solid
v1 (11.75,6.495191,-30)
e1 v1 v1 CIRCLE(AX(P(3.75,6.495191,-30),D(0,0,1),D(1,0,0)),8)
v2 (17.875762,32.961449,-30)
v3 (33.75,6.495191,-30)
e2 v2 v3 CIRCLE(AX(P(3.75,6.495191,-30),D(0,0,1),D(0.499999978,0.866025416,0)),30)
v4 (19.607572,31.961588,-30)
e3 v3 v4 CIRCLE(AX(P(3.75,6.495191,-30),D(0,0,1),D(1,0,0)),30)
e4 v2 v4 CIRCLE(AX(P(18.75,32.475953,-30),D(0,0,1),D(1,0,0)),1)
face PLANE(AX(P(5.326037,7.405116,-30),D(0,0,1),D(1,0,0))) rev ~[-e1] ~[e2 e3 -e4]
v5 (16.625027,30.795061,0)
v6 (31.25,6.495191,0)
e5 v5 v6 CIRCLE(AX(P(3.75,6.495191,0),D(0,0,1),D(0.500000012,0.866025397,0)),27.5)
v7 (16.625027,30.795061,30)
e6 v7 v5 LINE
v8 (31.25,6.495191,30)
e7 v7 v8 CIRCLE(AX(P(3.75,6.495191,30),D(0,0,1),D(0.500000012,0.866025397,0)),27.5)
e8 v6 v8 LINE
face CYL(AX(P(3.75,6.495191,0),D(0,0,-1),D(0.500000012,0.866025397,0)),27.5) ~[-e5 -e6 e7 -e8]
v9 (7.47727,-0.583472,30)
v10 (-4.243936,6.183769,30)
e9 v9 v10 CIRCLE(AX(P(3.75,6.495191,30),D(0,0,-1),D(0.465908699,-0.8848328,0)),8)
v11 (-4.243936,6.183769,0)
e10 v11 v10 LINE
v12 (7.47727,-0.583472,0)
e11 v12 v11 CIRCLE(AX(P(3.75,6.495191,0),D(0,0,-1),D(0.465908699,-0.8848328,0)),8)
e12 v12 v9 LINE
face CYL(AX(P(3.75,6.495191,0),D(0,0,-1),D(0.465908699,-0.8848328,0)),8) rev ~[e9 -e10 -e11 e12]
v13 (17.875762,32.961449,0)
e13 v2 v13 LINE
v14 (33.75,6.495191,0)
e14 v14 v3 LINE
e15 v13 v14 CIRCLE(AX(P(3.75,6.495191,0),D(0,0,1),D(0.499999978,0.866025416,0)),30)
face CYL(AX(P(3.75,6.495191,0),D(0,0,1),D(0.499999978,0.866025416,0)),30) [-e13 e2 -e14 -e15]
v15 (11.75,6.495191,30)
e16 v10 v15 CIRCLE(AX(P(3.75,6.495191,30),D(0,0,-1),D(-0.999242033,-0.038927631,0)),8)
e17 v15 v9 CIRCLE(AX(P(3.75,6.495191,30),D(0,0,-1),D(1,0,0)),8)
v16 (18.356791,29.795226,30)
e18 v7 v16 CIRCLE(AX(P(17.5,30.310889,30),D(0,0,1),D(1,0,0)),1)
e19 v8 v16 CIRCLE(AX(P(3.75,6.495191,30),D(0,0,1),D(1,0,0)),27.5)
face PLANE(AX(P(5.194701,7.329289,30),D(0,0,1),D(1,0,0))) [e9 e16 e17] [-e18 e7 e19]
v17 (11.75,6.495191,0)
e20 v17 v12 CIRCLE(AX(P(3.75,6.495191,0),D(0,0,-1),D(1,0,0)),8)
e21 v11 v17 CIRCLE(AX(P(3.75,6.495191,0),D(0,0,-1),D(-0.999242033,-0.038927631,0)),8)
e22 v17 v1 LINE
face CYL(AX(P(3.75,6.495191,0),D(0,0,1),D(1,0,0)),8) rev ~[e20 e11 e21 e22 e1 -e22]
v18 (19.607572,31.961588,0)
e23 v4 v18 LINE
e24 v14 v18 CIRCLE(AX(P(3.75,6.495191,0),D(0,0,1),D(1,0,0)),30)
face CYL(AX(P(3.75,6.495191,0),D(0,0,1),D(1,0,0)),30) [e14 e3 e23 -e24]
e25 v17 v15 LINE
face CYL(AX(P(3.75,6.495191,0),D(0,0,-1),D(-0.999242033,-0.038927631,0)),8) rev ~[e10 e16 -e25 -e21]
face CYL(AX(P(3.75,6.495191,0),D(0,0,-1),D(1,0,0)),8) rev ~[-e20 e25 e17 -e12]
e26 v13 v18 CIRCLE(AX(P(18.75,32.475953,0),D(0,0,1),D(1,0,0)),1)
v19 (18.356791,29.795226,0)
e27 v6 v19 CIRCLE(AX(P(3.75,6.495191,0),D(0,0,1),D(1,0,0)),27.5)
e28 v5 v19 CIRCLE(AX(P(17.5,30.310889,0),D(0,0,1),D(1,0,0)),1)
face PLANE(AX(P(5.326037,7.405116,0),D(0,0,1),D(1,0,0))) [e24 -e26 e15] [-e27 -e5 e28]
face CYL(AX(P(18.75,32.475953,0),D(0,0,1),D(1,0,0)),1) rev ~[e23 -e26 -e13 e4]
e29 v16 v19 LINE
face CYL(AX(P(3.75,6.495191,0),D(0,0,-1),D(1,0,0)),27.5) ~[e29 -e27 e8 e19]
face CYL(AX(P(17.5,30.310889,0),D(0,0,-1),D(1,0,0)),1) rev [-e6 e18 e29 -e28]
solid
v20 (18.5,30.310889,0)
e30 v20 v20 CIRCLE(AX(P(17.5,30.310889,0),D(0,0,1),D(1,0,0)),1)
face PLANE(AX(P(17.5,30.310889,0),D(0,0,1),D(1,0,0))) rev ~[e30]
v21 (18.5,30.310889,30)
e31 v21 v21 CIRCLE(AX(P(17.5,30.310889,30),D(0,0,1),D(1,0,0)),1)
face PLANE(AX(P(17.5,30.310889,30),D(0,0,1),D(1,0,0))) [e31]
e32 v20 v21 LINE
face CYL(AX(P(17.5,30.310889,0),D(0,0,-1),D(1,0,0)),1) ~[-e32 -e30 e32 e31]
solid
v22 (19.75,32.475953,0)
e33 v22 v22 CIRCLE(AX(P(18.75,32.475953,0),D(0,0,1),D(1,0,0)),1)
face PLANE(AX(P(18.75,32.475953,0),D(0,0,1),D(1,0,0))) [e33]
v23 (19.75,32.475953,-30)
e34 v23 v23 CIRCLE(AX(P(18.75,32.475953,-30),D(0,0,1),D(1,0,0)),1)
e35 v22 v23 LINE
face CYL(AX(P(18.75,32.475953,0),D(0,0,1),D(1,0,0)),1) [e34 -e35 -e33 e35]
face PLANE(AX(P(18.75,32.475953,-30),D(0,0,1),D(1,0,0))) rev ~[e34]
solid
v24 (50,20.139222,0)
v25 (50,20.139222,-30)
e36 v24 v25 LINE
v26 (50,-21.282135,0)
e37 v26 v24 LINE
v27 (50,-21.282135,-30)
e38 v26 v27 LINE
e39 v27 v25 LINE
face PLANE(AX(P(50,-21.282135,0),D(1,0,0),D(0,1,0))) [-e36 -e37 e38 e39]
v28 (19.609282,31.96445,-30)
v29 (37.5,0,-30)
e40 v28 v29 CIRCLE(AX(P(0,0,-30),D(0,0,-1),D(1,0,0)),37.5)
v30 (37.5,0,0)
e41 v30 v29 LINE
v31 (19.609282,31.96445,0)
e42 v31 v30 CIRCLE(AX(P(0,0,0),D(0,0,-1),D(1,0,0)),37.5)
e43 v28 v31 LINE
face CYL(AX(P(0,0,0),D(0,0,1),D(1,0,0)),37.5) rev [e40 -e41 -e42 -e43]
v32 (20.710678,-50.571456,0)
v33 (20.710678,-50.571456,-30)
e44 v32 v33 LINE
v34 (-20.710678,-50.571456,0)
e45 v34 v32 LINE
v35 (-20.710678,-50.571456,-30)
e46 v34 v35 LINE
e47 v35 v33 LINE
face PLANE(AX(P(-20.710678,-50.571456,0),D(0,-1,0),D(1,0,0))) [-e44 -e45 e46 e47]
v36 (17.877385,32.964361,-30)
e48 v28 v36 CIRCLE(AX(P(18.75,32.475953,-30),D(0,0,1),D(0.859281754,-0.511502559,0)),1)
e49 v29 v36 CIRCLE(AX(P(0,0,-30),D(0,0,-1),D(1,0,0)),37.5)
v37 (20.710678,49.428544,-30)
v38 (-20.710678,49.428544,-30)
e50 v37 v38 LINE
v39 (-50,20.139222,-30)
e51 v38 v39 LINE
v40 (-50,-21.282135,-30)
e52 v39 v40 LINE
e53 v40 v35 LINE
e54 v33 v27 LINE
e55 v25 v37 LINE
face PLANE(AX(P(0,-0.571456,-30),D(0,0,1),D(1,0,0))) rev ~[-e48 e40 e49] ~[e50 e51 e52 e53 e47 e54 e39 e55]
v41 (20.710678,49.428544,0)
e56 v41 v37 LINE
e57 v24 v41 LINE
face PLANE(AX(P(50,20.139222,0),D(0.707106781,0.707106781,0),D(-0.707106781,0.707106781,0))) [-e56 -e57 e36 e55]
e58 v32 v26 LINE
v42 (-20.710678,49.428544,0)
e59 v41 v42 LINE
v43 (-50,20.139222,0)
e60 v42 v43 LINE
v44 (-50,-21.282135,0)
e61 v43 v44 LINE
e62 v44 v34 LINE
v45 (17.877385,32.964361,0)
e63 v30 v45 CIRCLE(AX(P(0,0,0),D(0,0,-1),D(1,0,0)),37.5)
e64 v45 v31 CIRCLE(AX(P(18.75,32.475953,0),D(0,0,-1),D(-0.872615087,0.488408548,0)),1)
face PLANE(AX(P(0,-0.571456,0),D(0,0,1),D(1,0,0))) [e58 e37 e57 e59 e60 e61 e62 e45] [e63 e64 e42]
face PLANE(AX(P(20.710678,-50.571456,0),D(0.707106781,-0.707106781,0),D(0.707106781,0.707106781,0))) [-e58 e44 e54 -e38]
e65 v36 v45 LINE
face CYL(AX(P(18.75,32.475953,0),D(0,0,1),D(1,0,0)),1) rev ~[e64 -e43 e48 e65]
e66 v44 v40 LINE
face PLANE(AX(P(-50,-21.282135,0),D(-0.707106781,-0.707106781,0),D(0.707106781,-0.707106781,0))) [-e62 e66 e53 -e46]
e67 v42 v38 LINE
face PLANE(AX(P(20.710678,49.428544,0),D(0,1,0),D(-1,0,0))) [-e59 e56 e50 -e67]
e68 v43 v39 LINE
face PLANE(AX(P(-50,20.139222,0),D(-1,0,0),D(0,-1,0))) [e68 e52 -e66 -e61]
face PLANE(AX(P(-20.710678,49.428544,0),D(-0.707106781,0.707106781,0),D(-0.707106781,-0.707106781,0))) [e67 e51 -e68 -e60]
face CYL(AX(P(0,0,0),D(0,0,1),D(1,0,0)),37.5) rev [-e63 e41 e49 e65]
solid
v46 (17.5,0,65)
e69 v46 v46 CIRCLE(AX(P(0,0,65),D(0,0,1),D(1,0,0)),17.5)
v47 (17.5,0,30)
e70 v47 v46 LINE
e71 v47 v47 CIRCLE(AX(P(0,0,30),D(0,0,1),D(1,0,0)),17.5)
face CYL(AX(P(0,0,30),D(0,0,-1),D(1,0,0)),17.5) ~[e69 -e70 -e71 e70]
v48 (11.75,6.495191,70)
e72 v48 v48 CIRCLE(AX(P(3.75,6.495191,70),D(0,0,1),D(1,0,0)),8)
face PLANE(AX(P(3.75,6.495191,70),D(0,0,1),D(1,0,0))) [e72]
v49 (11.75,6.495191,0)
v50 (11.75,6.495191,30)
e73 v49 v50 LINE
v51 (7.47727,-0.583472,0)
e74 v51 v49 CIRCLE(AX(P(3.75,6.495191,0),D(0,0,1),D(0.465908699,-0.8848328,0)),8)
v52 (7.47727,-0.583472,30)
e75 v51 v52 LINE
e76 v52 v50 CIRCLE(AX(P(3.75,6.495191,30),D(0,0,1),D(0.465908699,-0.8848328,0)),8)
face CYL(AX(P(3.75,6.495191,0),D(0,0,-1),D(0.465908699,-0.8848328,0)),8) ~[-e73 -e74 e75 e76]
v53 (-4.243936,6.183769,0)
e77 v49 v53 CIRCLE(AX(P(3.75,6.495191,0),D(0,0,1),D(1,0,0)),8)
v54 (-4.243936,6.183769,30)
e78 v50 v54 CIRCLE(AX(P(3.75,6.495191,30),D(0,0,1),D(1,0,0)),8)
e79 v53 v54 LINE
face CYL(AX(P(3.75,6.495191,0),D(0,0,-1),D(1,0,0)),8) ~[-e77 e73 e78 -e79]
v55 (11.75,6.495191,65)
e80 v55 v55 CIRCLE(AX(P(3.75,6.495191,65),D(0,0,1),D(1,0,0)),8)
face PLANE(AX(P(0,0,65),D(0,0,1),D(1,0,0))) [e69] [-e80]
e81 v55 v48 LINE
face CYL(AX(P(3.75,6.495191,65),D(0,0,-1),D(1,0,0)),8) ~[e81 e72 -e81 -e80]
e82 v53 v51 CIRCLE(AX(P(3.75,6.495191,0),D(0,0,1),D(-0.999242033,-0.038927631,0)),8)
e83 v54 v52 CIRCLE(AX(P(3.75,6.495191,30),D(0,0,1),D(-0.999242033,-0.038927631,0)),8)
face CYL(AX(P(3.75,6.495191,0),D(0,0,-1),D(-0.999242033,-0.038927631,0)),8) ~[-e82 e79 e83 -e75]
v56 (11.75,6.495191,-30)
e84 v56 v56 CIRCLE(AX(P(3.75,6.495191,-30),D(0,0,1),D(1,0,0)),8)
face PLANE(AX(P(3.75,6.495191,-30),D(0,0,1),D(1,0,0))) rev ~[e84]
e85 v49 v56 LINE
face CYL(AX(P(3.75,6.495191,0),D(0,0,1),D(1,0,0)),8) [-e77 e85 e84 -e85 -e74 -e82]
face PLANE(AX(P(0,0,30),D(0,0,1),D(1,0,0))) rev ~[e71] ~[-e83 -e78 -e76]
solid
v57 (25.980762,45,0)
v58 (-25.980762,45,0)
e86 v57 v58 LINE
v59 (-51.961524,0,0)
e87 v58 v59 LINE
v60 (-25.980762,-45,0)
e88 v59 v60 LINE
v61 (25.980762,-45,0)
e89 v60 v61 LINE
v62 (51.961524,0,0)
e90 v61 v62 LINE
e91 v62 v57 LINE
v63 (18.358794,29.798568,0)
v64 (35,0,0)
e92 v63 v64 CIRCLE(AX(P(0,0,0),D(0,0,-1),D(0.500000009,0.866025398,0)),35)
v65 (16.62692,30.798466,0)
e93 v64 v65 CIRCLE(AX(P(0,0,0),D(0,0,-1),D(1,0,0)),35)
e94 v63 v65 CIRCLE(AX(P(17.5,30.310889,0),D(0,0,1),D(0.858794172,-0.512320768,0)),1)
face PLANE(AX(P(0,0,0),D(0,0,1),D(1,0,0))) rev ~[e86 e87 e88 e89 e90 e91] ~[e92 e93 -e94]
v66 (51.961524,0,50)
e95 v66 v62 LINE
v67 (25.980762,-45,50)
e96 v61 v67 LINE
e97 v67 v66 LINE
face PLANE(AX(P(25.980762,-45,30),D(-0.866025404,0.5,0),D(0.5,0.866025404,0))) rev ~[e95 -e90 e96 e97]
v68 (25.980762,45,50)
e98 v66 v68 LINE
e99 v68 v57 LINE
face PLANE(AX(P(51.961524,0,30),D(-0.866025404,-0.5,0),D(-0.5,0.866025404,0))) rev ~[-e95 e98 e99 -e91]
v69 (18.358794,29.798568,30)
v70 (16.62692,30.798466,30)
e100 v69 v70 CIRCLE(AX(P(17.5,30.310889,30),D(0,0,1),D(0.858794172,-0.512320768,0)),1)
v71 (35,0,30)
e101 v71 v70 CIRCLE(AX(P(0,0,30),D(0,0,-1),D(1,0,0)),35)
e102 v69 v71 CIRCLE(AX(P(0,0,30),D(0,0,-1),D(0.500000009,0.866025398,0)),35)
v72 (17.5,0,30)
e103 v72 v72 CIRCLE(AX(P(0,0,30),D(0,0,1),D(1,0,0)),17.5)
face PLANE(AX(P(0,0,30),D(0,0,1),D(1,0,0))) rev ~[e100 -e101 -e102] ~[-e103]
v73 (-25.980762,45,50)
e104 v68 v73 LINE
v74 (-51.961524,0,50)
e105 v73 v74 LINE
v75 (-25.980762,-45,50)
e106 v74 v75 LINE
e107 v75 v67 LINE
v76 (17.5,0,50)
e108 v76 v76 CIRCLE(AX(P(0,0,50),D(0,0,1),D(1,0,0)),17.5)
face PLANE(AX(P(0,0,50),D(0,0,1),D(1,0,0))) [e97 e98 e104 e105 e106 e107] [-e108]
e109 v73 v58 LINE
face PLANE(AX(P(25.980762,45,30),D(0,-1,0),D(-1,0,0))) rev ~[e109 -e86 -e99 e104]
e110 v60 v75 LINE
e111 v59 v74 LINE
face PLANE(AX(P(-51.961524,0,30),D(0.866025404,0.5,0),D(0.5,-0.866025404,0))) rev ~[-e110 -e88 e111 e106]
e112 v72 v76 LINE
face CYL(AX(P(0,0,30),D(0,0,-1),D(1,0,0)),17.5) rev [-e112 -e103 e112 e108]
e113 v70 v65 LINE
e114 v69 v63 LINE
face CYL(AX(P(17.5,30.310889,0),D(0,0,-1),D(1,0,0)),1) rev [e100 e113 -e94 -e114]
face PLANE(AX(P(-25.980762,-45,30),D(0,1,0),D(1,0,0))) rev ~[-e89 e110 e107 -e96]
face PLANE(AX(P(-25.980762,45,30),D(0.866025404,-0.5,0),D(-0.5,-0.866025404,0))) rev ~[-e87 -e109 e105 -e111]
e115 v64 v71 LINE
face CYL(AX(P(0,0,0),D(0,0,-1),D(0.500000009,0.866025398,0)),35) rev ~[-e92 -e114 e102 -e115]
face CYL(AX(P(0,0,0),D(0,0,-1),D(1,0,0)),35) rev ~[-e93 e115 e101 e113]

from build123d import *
from build123d import SkipClean  # not in build123d's __all__

# Parameters (mm, degrees)
F1_DEPTH  = 30
F2_R      = 17.5
F3_DEPTH  = 20
F0_R      = 17.5
F4_DEPTH  = 30
F5_R      = 17.5
F6_DEPTH  = 35
F7_DEPTH  = 30
F8_R      = 8
F9_DEPTH  = 30
F10_R     = 8
F11_DEPTH = 5
F13_DEPTH = 30
F14_R     = 8
F15_DEPTH = 30
F16_R     = 1
F17_DEPTH = 30
F18_DEPTH = 30


# Not quite as in the source:
# - after a boolean that leaves OpenCascade's solid faulty, fix() repairs it


with BuildPart() as f1:
    # F0 (on Top) → F1 (new body)
    with BuildSketch(Plane.XY):
        with BuildLine():
            ThreePointArc((7.4772695936, -0.5834718719), (7.494315244, -0.29195723), (7.5, 0))
            ThreePointArc((7.5, 0), (6.4951905284, 3.75), (3.75, 6.4951905284))
            ThreePointArc((3.75, 6.4951905284), (-0.29195723, 7.494315244), (-4.2439362602, 6.183769483))
            ThreePointArc((-4.2439362602, 6.183769483), (-0.25, -0.4330127019), (7.4772695936, -0.5834718719))
        make_face()
        with BuildLine():
            ThreePointArc((3.75, 6.4951905284), (6.4951905284, 3.75), (7.5, 0))
            ThreePointArc((7.5, 0), (7.494315244, -0.29195723), (7.4772695936, -0.5834718719))
            ThreePointArc((7.4772695936, -0.5834718719), (10.5990202492, 2.3610737393), (11.75, 6.4951905284))
            ThreePointArc((11.75, 6.4951905284), (3.5942599631, 14.4936744498), (-4.2439362602, 6.183769483))
            ThreePointArc((-4.2439362602, 6.183769483), (-0.29195723, 7.494315244), (3.75, 6.4951905284))
        make_face()
    extrude(amount=F1_DEPTH)

    # F5 (on face) → F6 (join)
    with BuildSketch(Plane.XY.offset(30)):
        Circle(F5_R)
        with BuildLine():
            ThreePointArc((-4.2439362602, 6.183769483), (7.75, 13.4233937587), (7.4772695936, -0.5834718719))
            ThreePointArc((7.4772695936, -0.5834718719), (-3.75, -6.4951905284), (-4.2439362602, 6.183769483))
        make_face(mode=Mode.SUBTRACT)
        with BuildLine():
            ThreePointArc((-4.2439362602, 6.183769483), (-3.75, -6.4951905284), (7.4772695936, -0.5834718719))
            ThreePointArc((7.4772695936, -0.5834718719), (7.75, 13.4233937587), (-4.2439362602, 6.183769483))
        make_face()
    extrude(amount=F6_DEPTH)

    # F8 (on face) → F9 (join)
    with BuildSketch(Plane.XY):
        with Locations((3.75, 6.4951905284)):
            Circle(F8_R)
    extrude(amount=-F9_DEPTH)

    # F10 (on face) → F11 (join)
    with BuildSketch(Plane.XY.offset(65)):
        with Locations((3.75, 6.4951905284)):
            Circle(F10_R)
    extrude(amount=F11_DEPTH)


with BuildPart() as f1b:
    # F0 (on Top) → F1, piece 2 (new body)
    with BuildSketch(Plane.XY):
        Polygon((25.9807621135, 45), (-25.9807621135, 45), (-51.9615242271, 0), (-25.9807621135, -45), (25.9807621135, -45), (51.9615242271, 0), align=None)
        with BuildLine():
            ThreePointArc((35, 0), (-30.3108892273, -17.4999998357), (17.5000003287, 30.3108889427))
            ThreePointArc((17.5000003287, 30.3108889427), (30.3108892273, 17.4999998357), (35, 0))
        make_face(mode=Mode.SUBTRACT)
    extrude(amount=F1_DEPTH)

    # F2 (on face) → F3 (join)
    with BuildSketch(Plane.XY.offset(30)):
        Polygon((-25.9807621135, 45), (-51.9615242271, 0), (-25.9807621135, -45), (25.9807621135, -45), (51.9615242271, 0), (25.9807621135, 45), align=None)
        Circle(F2_R, mode=Mode.SUBTRACT)
    extrude(amount=F3_DEPTH)


with BuildPart() as f4:
    # F0 (on Top) → F4 (new body)
    with BuildSketch(Plane.XY):
        with BuildLine():
            ThreePointArc((17.5000003287, 30.3108889427), (-20.0656986989, -7.2548093073), (31.25, 6.4951905284))
            ThreePointArc((31.25, 6.4951905284), (27.5656986989, 20.2451903641), (17.5000003287, 30.3108889427))
        make_face()
        Circle(F0_R, mode=Mode.SUBTRACT)
        Circle(F0_R)
        with BuildLine():
            ThreePointArc((11.75, 6.4951905284), (10.5990202492, 2.3610737393), (7.4772695936, -0.5834718719))
            ThreePointArc((7.4772695936, -0.5834718719), (-3.75, -6.4951905284), (-4.2439362602, 6.183769483))
            ThreePointArc((-4.2439362602, 6.183769483), (3.5942599631, 14.4936744498), (11.75, 6.4951905284))
        make_face(mode=Mode.SUBTRACT)
    extrude(amount=F4_DEPTH)

    # F0 (on Top) → F7 (join)
    with BuildSketch(Plane.XY):
        with BuildLine():
            ThreePointArc((17.5000003287, 30.3108889427), (-20.0656986989, -7.2548093073), (31.25, 6.4951905284))
            ThreePointArc((31.25, 6.4951905284), (27.5656986989, 20.2451903641), (17.5000003287, 30.3108889427))
        make_face()
        Circle(F0_R, mode=Mode.SUBTRACT)
        Circle(F0_R)
        with BuildLine():
            ThreePointArc((11.75, 6.4951905284), (10.5990202492, 2.3610737393), (7.4772695936, -0.5834718719))
            ThreePointArc((7.4772695936, -0.5834718719), (-3.75, -6.4951905284), (-4.2439362602, 6.183769483))
            ThreePointArc((-4.2439362602, 6.183769483), (3.5942599631, 14.4936744498), (11.75, 6.4951905284))
        make_face(mode=Mode.SUBTRACT)
        with BuildLine():
            ThreePointArc((-4.2439362602, 6.183769483), (-3.75, -6.4951905284), (7.4772695936, -0.5834718719))
            ThreePointArc((7.4772695936, -0.5834718719), (-0.25, -0.4330127019), (-4.2439362602, 6.183769483))
        make_face()
    extrude(amount=F7_DEPTH)

    # F14 (on face) → F15 (join)
    with BuildSketch(Plane.XY):
        with BuildLine():
            ThreePointArc((18.7499993484, 32.4759530181), (-22.2307619254, -8.5048097974), (33.75, 6.4951905284))
            ThreePointArc((33.75, 6.4951905284), (29.7307619254, 21.4951908542), (18.7499993484, 32.4759530181))
        make_face()
        with Locations((3.75, 6.4951905284)):
            Circle(F14_R, mode=Mode.SUBTRACT)
    with SkipClean():  # cleaning this boolean's faces spoils the solid; the shape is the same uncleaned
        extrude(amount=-F15_DEPTH)


with BuildPart() as f13:
    # F12 (on Top) → F13 (new body)
    with BuildSketch(Plane.XY):
        Polygon((50, 20.1392216345), (20.7106781187, 49.4285435158), (-20.7106781187, 49.4285435158), (-50, 20.1392216345), (-50, -21.2821346028), (-20.7106781187, -50.5714564842), (20.7106781187, -50.5714564842), (50, -21.2821346028), align=None)
        with BuildLine():
            ThreePointArc((18.7499993484, 32.4759530181), (32.4759524538, 18.7500003258), (37.5, 0))
            ThreePointArc((37.5, 0), (-32.4759524538, -18.7500003258), (18.7499993484, 32.4759530181))
        make_face(mode=Mode.SUBTRACT)
    extrude(amount=-F13_DEPTH)


with BuildPart() as f17:
    # F16 (on Top) → F17 (new body)
    with BuildSketch(Plane.XY):
        with Locations((17.5, 30.3108891325)):
            Circle(F16_R)
    extrude(amount=F17_DEPTH)


with BuildPart() as f18:
    # F16 (on Top) → F18 (new body)
    with BuildSketch(Plane.XY):
        with Locations((18.75, 32.4759526419)):
            Circle(F16_R)
    extrude(amount=-F18_DEPTH)


with BuildPart() as f1b_1:
    add(f1b.part, clean=False)

    # F19: cut F17
    add(f17.part, mode=Mode.SUBTRACT)


with BuildPart() as f4_1:
    add(f4.part, clean=False)

    # F19: cut F17
    add(f17.part, mode=Mode.SUBTRACT)

    add(f4_1.part.fix(), mode=Mode.REPLACE)

    # F20: cut F18
    add(f18.part, mode=Mode.SUBTRACT)


with BuildPart() as f13_1:
    add(f13.part, clean=False)

    # F20: cut F18
    add(f18.part, mode=Mode.SUBTRACT)


solid = Compound([f1.part, f17.part, f18.part, f1b_1.part, f4_1.part, f13_1.part])
